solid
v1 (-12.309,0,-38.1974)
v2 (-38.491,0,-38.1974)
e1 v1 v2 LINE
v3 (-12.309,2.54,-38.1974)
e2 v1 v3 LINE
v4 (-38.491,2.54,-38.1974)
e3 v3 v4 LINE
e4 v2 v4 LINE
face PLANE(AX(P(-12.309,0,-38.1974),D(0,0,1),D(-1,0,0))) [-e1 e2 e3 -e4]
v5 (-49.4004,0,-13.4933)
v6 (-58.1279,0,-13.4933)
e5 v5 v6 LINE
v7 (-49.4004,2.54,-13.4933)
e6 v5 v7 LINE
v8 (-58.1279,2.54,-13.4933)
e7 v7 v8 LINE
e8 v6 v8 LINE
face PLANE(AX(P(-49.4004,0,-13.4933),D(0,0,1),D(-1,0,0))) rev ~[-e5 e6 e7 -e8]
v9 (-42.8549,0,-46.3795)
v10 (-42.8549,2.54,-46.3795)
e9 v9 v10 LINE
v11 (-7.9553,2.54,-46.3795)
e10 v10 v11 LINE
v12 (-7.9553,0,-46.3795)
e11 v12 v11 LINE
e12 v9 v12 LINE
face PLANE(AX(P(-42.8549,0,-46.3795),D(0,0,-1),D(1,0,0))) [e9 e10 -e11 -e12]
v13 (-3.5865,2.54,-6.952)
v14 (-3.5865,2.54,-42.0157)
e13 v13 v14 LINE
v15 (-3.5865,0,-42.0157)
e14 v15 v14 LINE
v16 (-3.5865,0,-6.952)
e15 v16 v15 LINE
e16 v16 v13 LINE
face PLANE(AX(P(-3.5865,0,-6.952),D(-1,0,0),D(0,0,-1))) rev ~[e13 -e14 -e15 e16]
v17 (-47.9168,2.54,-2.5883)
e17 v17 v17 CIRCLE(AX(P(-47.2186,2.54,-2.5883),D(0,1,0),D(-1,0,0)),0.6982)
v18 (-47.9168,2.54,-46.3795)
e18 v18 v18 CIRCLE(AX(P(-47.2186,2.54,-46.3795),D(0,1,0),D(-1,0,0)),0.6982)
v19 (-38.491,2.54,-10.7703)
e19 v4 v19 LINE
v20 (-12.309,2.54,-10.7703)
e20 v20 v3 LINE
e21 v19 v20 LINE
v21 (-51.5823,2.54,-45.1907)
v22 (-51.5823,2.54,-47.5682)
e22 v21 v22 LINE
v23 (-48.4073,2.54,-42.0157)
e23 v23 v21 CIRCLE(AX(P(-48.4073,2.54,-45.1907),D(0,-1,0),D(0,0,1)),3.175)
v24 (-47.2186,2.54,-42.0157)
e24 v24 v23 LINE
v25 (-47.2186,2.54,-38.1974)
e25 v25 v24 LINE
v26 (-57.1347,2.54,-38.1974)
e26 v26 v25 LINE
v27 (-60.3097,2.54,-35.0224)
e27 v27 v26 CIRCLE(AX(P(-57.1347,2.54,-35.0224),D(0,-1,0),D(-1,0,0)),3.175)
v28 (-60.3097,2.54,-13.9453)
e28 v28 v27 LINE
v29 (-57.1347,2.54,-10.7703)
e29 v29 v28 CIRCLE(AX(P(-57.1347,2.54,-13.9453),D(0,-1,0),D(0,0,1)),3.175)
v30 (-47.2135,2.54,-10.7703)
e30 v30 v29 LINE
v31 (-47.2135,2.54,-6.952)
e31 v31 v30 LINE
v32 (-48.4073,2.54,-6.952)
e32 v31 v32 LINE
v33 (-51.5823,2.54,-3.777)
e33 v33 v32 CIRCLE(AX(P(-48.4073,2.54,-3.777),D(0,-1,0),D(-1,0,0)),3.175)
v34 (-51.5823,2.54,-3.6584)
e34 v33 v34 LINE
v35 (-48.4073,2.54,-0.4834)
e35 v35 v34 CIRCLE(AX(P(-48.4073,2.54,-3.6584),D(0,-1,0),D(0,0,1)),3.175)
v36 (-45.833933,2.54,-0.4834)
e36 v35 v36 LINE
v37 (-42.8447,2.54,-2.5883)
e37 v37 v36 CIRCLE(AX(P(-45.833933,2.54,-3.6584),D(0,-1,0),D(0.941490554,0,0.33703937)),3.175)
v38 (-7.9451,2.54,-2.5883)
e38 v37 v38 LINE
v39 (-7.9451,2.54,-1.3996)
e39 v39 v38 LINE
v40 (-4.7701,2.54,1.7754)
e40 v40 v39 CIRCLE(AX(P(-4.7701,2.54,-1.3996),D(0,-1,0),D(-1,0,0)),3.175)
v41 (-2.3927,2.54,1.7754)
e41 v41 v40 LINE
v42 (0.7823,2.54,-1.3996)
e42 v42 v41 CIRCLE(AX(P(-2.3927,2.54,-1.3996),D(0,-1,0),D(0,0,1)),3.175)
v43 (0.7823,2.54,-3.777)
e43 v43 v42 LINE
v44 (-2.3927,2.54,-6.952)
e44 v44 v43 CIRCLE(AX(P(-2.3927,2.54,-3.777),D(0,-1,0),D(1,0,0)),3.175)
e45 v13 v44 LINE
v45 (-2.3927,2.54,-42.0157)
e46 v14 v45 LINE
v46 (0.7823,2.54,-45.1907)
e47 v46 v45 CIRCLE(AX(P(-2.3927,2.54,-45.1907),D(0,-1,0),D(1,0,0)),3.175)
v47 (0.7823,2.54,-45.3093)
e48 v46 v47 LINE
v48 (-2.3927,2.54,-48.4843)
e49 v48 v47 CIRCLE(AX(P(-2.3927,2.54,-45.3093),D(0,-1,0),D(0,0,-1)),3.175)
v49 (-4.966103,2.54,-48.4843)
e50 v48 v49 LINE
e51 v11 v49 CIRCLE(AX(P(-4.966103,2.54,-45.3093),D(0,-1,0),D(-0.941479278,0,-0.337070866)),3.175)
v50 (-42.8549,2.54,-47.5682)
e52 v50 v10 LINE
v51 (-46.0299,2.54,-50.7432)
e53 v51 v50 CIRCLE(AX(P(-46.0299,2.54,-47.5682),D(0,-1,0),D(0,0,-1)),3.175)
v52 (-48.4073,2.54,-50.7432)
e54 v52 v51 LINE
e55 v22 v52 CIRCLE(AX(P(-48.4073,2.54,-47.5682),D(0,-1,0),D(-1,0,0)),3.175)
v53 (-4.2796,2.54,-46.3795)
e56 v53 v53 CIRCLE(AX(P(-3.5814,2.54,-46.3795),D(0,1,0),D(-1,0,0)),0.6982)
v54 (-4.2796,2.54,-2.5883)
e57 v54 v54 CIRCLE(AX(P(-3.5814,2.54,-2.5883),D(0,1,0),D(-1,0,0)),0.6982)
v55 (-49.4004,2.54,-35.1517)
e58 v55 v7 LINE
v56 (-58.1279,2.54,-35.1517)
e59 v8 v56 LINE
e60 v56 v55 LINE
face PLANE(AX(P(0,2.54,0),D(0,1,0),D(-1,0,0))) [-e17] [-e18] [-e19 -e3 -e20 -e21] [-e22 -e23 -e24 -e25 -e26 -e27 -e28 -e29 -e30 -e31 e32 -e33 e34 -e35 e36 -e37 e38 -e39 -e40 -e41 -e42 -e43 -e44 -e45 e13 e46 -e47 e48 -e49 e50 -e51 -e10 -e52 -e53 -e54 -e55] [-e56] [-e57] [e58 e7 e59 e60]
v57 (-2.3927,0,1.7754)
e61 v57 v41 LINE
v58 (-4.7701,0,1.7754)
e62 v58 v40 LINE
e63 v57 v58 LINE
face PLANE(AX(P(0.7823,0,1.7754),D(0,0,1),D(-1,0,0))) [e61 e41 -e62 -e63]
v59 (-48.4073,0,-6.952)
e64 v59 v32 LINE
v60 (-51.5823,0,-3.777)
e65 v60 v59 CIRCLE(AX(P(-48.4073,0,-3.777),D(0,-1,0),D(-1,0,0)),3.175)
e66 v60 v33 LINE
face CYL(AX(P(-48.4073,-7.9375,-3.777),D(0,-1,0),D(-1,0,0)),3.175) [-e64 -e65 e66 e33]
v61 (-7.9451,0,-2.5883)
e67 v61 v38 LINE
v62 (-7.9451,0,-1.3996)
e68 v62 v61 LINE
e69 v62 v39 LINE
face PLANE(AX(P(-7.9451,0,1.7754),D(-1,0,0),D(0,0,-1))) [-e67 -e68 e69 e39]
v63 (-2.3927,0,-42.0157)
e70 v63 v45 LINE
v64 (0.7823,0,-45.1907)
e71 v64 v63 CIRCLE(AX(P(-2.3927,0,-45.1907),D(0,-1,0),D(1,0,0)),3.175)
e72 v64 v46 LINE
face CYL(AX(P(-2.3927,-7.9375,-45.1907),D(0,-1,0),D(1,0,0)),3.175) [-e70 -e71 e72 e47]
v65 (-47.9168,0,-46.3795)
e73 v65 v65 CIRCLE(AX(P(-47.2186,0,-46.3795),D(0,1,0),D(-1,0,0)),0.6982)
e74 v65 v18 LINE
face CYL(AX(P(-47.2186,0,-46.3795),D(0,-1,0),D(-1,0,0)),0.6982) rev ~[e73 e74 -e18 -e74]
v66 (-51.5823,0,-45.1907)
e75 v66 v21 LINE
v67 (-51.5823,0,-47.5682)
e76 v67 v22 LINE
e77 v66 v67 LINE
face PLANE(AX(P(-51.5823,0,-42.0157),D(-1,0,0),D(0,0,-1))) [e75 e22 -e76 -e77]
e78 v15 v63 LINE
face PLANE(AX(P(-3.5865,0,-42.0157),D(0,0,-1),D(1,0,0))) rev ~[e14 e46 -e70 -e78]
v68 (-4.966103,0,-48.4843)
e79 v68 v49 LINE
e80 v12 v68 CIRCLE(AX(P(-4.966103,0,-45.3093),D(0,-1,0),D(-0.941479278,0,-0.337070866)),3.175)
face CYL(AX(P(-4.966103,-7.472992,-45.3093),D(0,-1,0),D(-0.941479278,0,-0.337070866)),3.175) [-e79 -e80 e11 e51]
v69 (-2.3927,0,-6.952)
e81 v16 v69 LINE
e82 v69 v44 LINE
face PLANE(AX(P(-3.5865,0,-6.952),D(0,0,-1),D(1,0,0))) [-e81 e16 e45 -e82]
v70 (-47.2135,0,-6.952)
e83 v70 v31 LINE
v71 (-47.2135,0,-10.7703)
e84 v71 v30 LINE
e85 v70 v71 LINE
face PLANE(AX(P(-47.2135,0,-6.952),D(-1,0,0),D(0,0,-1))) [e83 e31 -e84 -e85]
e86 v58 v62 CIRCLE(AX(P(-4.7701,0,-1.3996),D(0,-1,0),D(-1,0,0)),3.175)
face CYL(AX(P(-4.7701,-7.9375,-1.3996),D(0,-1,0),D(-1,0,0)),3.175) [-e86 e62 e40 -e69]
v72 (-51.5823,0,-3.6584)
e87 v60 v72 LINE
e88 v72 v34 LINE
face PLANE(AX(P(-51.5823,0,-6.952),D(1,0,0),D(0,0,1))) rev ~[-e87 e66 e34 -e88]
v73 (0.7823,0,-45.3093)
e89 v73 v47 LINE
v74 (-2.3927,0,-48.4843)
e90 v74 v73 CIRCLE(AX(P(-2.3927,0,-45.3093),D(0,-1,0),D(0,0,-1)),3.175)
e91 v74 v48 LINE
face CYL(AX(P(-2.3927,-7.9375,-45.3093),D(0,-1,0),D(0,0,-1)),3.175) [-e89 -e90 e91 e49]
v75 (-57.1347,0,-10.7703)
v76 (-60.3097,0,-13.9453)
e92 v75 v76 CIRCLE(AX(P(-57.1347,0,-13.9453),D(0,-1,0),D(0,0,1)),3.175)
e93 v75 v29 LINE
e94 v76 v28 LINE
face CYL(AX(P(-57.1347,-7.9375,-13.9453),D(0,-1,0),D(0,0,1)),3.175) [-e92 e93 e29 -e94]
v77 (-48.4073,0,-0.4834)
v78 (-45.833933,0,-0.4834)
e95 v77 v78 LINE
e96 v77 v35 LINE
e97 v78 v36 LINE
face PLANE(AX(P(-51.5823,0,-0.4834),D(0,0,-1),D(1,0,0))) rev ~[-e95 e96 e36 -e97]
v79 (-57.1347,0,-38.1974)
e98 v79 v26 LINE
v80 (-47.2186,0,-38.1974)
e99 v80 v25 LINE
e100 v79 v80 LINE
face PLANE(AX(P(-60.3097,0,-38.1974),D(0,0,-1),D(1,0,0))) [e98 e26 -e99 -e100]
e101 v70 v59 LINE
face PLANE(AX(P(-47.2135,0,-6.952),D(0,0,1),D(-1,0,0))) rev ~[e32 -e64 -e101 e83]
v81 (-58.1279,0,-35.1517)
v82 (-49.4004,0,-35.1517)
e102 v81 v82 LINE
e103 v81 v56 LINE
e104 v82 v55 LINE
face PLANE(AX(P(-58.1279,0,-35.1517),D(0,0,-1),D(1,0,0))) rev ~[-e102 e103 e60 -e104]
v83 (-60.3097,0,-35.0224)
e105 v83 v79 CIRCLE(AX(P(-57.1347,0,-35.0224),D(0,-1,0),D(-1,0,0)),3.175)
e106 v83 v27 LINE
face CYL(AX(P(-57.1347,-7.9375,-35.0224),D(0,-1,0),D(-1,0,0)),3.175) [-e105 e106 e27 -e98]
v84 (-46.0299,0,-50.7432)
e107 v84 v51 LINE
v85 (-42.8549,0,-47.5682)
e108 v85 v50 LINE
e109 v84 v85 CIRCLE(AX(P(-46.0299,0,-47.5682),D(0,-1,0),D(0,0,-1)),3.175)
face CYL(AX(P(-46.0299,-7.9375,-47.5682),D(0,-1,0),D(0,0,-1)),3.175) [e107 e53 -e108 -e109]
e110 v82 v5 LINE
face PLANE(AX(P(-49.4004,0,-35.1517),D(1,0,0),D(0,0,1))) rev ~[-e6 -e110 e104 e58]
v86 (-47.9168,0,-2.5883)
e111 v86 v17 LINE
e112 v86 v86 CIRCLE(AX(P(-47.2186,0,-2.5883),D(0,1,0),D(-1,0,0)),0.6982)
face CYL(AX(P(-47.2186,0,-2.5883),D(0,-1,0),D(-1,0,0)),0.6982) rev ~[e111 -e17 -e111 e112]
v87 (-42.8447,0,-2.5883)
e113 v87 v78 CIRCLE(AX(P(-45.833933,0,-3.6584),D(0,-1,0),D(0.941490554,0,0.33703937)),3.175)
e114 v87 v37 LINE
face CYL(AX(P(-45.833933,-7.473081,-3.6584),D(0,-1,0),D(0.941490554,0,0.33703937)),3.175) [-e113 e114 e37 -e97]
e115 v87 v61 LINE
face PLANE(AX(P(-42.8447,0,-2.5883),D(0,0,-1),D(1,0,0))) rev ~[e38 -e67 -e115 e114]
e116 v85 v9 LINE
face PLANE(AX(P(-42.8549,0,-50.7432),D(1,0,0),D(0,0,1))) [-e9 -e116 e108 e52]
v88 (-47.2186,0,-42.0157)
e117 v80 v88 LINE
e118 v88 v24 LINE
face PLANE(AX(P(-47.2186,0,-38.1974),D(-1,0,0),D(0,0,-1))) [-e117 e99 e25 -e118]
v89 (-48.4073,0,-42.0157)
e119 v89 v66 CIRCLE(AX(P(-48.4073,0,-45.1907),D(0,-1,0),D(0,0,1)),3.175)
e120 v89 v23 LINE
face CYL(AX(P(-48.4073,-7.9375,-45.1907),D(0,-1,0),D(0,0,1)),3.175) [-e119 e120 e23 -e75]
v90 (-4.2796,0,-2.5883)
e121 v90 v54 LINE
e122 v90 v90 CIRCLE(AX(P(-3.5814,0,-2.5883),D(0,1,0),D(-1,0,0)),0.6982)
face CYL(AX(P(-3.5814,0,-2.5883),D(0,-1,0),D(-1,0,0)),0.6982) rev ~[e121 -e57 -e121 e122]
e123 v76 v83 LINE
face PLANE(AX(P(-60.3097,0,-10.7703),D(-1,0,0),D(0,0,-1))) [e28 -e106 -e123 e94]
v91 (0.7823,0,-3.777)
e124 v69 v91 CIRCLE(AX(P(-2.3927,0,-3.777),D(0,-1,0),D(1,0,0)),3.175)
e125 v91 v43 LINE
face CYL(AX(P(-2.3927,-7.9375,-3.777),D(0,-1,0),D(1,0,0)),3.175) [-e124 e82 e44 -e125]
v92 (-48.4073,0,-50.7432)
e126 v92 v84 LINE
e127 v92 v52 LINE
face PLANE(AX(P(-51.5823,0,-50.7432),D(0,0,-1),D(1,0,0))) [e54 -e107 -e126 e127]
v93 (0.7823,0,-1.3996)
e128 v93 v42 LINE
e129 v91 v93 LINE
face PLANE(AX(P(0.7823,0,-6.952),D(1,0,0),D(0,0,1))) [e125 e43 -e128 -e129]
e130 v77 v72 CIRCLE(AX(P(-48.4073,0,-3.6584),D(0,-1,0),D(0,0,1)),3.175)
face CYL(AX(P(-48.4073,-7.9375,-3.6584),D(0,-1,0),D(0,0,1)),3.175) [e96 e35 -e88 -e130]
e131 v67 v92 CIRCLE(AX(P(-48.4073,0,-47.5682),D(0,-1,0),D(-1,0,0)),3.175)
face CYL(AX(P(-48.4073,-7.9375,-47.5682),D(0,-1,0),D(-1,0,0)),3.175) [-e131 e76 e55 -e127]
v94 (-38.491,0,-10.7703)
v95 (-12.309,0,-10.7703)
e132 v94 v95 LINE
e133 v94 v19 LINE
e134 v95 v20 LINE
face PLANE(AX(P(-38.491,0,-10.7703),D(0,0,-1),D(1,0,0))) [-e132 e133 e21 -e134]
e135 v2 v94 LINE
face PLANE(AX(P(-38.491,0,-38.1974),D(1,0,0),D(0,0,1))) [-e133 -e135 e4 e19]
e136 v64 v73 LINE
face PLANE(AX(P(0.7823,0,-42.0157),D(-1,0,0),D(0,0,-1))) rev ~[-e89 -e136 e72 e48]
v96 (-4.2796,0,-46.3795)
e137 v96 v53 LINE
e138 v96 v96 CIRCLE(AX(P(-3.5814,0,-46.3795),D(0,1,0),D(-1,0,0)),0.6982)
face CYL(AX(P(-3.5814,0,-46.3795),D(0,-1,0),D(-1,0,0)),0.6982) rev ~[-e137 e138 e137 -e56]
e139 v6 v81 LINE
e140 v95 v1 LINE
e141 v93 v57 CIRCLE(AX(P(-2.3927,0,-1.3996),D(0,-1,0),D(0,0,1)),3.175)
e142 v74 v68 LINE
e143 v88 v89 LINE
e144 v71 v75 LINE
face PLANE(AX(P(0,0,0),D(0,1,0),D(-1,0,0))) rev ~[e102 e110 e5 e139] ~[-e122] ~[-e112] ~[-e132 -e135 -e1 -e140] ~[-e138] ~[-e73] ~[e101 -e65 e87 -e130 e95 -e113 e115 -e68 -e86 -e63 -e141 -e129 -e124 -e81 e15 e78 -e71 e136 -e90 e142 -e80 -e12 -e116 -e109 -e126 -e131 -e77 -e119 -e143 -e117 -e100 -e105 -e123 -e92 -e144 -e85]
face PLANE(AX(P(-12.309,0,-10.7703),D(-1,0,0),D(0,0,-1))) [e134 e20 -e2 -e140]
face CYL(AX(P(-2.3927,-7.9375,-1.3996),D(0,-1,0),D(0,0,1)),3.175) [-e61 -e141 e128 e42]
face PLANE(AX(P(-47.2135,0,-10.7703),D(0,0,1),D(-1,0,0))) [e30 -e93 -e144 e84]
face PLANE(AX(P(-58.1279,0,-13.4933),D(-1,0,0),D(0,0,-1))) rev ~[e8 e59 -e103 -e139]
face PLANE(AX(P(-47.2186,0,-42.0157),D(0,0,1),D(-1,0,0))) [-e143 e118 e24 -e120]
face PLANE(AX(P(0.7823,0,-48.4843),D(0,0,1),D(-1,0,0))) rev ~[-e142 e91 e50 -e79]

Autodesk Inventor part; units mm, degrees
ref_plane "YZ Plane" through (0, 0, 0) normal (1, 0, 0) x (0, 1, 0)
ref_plane "XZ Plane" through (0, 0, 0) normal (0, 1, 0) x (-1, 0, 0)
ref_plane "XY Plane" through (0, 0, 0) normal (0, 0, 1) x (1, 0, 0)
sketch "Sketch1" plane through (0, 0, 0) normal (0, 1, 0) x (-1, 0, 0)
  line L0 (42.8447, -6.952) -> (51.5823, -6.952)
  line L1 (51.5823, -6.952) -> (51.5823, -0.4834)
  line L2 (51.5823, -0.4834) -> (42.8447, -0.4834)
  line L3 (42.8447, -0.4834) -> (42.8447, -6.952)
  line L4 (-0.7823, -48.4843) -> (7.9553, -48.4843)
  line L5 (7.9553, -48.4843) -> (7.9553, -42.0157)
  line L6 (7.9553, -42.0157) -> (-0.7823, -42.0157)
  line L7 (-0.7823, -42.0157) -> (-0.7823, -48.4843)
  line L8 (7.9451, -6.952) -> (-0.7823, -6.952)
  line L9 (-0.7823, -6.952) -> (-0.7823, 1.7754)
  line L10 (-0.7823, 1.7754) -> (7.9451, 1.7754)
  line L11 (7.9451, 1.7754) -> (7.9451, -6.952)
  line L12 (42.8549, -50.7432) -> (42.8549, -42.0157)
  line L13 (51.5823, -50.7432) -> (42.8549, -50.7432)
  line L14 (51.5823, -42.0157) -> (51.5823, -50.7432)
  line L15 (42.8549, -42.0157) -> (51.5823, -42.0157)
  line L16 (42.8447, -2.5883) -> (7.935, -2.5883)
  line L17 (42.8549, -42.0157) -> (42.8549, -46.3795)
  line L18 (42.8549, -46.3795) -> (7.9451, -46.3795)
  line L19 (42.8549, -42.0157) -> (47.2186, -42.0157)
  line L20 (7.9451, -6.952) -> (3.5865, -6.952)
  line L21 (3.5865, -6.952) -> (3.5865, -42.0157)
  line L22 (12.309, -38.1974) -> (38.491, -38.1974)
  line L23 (38.491, -38.1974) -> (38.491, -10.7703)
  line L24 (38.491, -10.7703) -> (12.309, -10.7703)
  line L25 (12.309, -10.7703) -> (12.309, -38.1974)
  line L26 (47.2135, -10.7703) -> (60.3097, -10.7703)
  line L27 (60.3097, -10.7703) -> (60.3097, -38.1974)
  line L28 (60.3097, -38.1974) -> (47.2186, -38.1974)
  line L29 (47.2135, -6.952) -> (47.2135, -10.7703)
  line L30 (47.2186, -38.1974) -> (47.2186, -42.0157)
  line L31 (47.2135, -6.952) -> (51.5823, -6.952)
  line L32 (49.4004, -13.4933) -> (58.1279, -13.4933)
  line L33 (58.1279, -13.4933) -> (58.1279, -35.1517)
  line L34 (58.1279, -35.1517) -> (49.4004, -35.1517)
  line L35 (49.4004, -35.1517) -> (49.4004, -13.4933)
  circle A0 centre (47.2186, -2.5883) radius 0.6982
  circle A1 centre (3.5814, -2.5883) radius 0.6982
  circle A2 centre (3.5814, -46.3795) radius 0.6982
  circle A3 centre (47.2186, -46.3795) radius 0.6982
  point P0 (0, 0)
  point P1 (25.4, -24.4839)
  point P2 (3.5865, -6.952)
  point P3 (7.9553, -46.3795)
  point P4 (7.9451, -2.5883)
  point P5 (47.2186, -42.0157)
  dimension "d2" = 8.7376
  dimension "d6" = 360
  dimension "d10" = 360
  dimension "d19" = 5.7909
  dimension "d20" = 5.7909
  dimension "d21" = 13.0912
  dimension "d29" = 1.3964
  dimension "d32" = 360
  dimension "d38" = 43.6372
extrude "Extrusion3" add sketch "Sketch1" along normal blind 2.54
fillet "Fillet4" radius 3.175 14 edges at (-51.5823, 1.27, -0.4834) (-42.8447, 1.27, -0.4834) (-51.5823, 1.27, -6.952) (-7.9451, 1.27, 1.7754) (0.7823, 1.27, 1.7754) (0.7823, 1.27, -6.952) (0.7823, 1.27, -42.0157) (0.7823, 1.27, -48.4843) (-7.9553, 1.27, -48.4843) (-42.8549, 1.27, -50.7432) (-51.5823, 1.27, -50.7432) (-51.5823, 1.27, -42.0157) (-60.3097, 1.27, -38.1974) (-60.3097, 1.27, -10.7703)
equation "\"BendRadius\" = Thickness"
equation "\"BendReliefWidth\" = Thickness"
equation "\"BendReliefDepth\" = 0.5 * Thickness"
equation "\"CornerReliefSize\" = 4 * Thickness"
equation "\"MinimumRemnant\" = 2 * Thickness"
equation "\"TransitionRadius\" = BendRadius"
equation "\"JacobiRadiusSize\" = BendRadius"
equation "\"GapSize\" = Thickness"
equation "\"Thickness\" = 3.048"
properties part number "PixfalconHolder"
